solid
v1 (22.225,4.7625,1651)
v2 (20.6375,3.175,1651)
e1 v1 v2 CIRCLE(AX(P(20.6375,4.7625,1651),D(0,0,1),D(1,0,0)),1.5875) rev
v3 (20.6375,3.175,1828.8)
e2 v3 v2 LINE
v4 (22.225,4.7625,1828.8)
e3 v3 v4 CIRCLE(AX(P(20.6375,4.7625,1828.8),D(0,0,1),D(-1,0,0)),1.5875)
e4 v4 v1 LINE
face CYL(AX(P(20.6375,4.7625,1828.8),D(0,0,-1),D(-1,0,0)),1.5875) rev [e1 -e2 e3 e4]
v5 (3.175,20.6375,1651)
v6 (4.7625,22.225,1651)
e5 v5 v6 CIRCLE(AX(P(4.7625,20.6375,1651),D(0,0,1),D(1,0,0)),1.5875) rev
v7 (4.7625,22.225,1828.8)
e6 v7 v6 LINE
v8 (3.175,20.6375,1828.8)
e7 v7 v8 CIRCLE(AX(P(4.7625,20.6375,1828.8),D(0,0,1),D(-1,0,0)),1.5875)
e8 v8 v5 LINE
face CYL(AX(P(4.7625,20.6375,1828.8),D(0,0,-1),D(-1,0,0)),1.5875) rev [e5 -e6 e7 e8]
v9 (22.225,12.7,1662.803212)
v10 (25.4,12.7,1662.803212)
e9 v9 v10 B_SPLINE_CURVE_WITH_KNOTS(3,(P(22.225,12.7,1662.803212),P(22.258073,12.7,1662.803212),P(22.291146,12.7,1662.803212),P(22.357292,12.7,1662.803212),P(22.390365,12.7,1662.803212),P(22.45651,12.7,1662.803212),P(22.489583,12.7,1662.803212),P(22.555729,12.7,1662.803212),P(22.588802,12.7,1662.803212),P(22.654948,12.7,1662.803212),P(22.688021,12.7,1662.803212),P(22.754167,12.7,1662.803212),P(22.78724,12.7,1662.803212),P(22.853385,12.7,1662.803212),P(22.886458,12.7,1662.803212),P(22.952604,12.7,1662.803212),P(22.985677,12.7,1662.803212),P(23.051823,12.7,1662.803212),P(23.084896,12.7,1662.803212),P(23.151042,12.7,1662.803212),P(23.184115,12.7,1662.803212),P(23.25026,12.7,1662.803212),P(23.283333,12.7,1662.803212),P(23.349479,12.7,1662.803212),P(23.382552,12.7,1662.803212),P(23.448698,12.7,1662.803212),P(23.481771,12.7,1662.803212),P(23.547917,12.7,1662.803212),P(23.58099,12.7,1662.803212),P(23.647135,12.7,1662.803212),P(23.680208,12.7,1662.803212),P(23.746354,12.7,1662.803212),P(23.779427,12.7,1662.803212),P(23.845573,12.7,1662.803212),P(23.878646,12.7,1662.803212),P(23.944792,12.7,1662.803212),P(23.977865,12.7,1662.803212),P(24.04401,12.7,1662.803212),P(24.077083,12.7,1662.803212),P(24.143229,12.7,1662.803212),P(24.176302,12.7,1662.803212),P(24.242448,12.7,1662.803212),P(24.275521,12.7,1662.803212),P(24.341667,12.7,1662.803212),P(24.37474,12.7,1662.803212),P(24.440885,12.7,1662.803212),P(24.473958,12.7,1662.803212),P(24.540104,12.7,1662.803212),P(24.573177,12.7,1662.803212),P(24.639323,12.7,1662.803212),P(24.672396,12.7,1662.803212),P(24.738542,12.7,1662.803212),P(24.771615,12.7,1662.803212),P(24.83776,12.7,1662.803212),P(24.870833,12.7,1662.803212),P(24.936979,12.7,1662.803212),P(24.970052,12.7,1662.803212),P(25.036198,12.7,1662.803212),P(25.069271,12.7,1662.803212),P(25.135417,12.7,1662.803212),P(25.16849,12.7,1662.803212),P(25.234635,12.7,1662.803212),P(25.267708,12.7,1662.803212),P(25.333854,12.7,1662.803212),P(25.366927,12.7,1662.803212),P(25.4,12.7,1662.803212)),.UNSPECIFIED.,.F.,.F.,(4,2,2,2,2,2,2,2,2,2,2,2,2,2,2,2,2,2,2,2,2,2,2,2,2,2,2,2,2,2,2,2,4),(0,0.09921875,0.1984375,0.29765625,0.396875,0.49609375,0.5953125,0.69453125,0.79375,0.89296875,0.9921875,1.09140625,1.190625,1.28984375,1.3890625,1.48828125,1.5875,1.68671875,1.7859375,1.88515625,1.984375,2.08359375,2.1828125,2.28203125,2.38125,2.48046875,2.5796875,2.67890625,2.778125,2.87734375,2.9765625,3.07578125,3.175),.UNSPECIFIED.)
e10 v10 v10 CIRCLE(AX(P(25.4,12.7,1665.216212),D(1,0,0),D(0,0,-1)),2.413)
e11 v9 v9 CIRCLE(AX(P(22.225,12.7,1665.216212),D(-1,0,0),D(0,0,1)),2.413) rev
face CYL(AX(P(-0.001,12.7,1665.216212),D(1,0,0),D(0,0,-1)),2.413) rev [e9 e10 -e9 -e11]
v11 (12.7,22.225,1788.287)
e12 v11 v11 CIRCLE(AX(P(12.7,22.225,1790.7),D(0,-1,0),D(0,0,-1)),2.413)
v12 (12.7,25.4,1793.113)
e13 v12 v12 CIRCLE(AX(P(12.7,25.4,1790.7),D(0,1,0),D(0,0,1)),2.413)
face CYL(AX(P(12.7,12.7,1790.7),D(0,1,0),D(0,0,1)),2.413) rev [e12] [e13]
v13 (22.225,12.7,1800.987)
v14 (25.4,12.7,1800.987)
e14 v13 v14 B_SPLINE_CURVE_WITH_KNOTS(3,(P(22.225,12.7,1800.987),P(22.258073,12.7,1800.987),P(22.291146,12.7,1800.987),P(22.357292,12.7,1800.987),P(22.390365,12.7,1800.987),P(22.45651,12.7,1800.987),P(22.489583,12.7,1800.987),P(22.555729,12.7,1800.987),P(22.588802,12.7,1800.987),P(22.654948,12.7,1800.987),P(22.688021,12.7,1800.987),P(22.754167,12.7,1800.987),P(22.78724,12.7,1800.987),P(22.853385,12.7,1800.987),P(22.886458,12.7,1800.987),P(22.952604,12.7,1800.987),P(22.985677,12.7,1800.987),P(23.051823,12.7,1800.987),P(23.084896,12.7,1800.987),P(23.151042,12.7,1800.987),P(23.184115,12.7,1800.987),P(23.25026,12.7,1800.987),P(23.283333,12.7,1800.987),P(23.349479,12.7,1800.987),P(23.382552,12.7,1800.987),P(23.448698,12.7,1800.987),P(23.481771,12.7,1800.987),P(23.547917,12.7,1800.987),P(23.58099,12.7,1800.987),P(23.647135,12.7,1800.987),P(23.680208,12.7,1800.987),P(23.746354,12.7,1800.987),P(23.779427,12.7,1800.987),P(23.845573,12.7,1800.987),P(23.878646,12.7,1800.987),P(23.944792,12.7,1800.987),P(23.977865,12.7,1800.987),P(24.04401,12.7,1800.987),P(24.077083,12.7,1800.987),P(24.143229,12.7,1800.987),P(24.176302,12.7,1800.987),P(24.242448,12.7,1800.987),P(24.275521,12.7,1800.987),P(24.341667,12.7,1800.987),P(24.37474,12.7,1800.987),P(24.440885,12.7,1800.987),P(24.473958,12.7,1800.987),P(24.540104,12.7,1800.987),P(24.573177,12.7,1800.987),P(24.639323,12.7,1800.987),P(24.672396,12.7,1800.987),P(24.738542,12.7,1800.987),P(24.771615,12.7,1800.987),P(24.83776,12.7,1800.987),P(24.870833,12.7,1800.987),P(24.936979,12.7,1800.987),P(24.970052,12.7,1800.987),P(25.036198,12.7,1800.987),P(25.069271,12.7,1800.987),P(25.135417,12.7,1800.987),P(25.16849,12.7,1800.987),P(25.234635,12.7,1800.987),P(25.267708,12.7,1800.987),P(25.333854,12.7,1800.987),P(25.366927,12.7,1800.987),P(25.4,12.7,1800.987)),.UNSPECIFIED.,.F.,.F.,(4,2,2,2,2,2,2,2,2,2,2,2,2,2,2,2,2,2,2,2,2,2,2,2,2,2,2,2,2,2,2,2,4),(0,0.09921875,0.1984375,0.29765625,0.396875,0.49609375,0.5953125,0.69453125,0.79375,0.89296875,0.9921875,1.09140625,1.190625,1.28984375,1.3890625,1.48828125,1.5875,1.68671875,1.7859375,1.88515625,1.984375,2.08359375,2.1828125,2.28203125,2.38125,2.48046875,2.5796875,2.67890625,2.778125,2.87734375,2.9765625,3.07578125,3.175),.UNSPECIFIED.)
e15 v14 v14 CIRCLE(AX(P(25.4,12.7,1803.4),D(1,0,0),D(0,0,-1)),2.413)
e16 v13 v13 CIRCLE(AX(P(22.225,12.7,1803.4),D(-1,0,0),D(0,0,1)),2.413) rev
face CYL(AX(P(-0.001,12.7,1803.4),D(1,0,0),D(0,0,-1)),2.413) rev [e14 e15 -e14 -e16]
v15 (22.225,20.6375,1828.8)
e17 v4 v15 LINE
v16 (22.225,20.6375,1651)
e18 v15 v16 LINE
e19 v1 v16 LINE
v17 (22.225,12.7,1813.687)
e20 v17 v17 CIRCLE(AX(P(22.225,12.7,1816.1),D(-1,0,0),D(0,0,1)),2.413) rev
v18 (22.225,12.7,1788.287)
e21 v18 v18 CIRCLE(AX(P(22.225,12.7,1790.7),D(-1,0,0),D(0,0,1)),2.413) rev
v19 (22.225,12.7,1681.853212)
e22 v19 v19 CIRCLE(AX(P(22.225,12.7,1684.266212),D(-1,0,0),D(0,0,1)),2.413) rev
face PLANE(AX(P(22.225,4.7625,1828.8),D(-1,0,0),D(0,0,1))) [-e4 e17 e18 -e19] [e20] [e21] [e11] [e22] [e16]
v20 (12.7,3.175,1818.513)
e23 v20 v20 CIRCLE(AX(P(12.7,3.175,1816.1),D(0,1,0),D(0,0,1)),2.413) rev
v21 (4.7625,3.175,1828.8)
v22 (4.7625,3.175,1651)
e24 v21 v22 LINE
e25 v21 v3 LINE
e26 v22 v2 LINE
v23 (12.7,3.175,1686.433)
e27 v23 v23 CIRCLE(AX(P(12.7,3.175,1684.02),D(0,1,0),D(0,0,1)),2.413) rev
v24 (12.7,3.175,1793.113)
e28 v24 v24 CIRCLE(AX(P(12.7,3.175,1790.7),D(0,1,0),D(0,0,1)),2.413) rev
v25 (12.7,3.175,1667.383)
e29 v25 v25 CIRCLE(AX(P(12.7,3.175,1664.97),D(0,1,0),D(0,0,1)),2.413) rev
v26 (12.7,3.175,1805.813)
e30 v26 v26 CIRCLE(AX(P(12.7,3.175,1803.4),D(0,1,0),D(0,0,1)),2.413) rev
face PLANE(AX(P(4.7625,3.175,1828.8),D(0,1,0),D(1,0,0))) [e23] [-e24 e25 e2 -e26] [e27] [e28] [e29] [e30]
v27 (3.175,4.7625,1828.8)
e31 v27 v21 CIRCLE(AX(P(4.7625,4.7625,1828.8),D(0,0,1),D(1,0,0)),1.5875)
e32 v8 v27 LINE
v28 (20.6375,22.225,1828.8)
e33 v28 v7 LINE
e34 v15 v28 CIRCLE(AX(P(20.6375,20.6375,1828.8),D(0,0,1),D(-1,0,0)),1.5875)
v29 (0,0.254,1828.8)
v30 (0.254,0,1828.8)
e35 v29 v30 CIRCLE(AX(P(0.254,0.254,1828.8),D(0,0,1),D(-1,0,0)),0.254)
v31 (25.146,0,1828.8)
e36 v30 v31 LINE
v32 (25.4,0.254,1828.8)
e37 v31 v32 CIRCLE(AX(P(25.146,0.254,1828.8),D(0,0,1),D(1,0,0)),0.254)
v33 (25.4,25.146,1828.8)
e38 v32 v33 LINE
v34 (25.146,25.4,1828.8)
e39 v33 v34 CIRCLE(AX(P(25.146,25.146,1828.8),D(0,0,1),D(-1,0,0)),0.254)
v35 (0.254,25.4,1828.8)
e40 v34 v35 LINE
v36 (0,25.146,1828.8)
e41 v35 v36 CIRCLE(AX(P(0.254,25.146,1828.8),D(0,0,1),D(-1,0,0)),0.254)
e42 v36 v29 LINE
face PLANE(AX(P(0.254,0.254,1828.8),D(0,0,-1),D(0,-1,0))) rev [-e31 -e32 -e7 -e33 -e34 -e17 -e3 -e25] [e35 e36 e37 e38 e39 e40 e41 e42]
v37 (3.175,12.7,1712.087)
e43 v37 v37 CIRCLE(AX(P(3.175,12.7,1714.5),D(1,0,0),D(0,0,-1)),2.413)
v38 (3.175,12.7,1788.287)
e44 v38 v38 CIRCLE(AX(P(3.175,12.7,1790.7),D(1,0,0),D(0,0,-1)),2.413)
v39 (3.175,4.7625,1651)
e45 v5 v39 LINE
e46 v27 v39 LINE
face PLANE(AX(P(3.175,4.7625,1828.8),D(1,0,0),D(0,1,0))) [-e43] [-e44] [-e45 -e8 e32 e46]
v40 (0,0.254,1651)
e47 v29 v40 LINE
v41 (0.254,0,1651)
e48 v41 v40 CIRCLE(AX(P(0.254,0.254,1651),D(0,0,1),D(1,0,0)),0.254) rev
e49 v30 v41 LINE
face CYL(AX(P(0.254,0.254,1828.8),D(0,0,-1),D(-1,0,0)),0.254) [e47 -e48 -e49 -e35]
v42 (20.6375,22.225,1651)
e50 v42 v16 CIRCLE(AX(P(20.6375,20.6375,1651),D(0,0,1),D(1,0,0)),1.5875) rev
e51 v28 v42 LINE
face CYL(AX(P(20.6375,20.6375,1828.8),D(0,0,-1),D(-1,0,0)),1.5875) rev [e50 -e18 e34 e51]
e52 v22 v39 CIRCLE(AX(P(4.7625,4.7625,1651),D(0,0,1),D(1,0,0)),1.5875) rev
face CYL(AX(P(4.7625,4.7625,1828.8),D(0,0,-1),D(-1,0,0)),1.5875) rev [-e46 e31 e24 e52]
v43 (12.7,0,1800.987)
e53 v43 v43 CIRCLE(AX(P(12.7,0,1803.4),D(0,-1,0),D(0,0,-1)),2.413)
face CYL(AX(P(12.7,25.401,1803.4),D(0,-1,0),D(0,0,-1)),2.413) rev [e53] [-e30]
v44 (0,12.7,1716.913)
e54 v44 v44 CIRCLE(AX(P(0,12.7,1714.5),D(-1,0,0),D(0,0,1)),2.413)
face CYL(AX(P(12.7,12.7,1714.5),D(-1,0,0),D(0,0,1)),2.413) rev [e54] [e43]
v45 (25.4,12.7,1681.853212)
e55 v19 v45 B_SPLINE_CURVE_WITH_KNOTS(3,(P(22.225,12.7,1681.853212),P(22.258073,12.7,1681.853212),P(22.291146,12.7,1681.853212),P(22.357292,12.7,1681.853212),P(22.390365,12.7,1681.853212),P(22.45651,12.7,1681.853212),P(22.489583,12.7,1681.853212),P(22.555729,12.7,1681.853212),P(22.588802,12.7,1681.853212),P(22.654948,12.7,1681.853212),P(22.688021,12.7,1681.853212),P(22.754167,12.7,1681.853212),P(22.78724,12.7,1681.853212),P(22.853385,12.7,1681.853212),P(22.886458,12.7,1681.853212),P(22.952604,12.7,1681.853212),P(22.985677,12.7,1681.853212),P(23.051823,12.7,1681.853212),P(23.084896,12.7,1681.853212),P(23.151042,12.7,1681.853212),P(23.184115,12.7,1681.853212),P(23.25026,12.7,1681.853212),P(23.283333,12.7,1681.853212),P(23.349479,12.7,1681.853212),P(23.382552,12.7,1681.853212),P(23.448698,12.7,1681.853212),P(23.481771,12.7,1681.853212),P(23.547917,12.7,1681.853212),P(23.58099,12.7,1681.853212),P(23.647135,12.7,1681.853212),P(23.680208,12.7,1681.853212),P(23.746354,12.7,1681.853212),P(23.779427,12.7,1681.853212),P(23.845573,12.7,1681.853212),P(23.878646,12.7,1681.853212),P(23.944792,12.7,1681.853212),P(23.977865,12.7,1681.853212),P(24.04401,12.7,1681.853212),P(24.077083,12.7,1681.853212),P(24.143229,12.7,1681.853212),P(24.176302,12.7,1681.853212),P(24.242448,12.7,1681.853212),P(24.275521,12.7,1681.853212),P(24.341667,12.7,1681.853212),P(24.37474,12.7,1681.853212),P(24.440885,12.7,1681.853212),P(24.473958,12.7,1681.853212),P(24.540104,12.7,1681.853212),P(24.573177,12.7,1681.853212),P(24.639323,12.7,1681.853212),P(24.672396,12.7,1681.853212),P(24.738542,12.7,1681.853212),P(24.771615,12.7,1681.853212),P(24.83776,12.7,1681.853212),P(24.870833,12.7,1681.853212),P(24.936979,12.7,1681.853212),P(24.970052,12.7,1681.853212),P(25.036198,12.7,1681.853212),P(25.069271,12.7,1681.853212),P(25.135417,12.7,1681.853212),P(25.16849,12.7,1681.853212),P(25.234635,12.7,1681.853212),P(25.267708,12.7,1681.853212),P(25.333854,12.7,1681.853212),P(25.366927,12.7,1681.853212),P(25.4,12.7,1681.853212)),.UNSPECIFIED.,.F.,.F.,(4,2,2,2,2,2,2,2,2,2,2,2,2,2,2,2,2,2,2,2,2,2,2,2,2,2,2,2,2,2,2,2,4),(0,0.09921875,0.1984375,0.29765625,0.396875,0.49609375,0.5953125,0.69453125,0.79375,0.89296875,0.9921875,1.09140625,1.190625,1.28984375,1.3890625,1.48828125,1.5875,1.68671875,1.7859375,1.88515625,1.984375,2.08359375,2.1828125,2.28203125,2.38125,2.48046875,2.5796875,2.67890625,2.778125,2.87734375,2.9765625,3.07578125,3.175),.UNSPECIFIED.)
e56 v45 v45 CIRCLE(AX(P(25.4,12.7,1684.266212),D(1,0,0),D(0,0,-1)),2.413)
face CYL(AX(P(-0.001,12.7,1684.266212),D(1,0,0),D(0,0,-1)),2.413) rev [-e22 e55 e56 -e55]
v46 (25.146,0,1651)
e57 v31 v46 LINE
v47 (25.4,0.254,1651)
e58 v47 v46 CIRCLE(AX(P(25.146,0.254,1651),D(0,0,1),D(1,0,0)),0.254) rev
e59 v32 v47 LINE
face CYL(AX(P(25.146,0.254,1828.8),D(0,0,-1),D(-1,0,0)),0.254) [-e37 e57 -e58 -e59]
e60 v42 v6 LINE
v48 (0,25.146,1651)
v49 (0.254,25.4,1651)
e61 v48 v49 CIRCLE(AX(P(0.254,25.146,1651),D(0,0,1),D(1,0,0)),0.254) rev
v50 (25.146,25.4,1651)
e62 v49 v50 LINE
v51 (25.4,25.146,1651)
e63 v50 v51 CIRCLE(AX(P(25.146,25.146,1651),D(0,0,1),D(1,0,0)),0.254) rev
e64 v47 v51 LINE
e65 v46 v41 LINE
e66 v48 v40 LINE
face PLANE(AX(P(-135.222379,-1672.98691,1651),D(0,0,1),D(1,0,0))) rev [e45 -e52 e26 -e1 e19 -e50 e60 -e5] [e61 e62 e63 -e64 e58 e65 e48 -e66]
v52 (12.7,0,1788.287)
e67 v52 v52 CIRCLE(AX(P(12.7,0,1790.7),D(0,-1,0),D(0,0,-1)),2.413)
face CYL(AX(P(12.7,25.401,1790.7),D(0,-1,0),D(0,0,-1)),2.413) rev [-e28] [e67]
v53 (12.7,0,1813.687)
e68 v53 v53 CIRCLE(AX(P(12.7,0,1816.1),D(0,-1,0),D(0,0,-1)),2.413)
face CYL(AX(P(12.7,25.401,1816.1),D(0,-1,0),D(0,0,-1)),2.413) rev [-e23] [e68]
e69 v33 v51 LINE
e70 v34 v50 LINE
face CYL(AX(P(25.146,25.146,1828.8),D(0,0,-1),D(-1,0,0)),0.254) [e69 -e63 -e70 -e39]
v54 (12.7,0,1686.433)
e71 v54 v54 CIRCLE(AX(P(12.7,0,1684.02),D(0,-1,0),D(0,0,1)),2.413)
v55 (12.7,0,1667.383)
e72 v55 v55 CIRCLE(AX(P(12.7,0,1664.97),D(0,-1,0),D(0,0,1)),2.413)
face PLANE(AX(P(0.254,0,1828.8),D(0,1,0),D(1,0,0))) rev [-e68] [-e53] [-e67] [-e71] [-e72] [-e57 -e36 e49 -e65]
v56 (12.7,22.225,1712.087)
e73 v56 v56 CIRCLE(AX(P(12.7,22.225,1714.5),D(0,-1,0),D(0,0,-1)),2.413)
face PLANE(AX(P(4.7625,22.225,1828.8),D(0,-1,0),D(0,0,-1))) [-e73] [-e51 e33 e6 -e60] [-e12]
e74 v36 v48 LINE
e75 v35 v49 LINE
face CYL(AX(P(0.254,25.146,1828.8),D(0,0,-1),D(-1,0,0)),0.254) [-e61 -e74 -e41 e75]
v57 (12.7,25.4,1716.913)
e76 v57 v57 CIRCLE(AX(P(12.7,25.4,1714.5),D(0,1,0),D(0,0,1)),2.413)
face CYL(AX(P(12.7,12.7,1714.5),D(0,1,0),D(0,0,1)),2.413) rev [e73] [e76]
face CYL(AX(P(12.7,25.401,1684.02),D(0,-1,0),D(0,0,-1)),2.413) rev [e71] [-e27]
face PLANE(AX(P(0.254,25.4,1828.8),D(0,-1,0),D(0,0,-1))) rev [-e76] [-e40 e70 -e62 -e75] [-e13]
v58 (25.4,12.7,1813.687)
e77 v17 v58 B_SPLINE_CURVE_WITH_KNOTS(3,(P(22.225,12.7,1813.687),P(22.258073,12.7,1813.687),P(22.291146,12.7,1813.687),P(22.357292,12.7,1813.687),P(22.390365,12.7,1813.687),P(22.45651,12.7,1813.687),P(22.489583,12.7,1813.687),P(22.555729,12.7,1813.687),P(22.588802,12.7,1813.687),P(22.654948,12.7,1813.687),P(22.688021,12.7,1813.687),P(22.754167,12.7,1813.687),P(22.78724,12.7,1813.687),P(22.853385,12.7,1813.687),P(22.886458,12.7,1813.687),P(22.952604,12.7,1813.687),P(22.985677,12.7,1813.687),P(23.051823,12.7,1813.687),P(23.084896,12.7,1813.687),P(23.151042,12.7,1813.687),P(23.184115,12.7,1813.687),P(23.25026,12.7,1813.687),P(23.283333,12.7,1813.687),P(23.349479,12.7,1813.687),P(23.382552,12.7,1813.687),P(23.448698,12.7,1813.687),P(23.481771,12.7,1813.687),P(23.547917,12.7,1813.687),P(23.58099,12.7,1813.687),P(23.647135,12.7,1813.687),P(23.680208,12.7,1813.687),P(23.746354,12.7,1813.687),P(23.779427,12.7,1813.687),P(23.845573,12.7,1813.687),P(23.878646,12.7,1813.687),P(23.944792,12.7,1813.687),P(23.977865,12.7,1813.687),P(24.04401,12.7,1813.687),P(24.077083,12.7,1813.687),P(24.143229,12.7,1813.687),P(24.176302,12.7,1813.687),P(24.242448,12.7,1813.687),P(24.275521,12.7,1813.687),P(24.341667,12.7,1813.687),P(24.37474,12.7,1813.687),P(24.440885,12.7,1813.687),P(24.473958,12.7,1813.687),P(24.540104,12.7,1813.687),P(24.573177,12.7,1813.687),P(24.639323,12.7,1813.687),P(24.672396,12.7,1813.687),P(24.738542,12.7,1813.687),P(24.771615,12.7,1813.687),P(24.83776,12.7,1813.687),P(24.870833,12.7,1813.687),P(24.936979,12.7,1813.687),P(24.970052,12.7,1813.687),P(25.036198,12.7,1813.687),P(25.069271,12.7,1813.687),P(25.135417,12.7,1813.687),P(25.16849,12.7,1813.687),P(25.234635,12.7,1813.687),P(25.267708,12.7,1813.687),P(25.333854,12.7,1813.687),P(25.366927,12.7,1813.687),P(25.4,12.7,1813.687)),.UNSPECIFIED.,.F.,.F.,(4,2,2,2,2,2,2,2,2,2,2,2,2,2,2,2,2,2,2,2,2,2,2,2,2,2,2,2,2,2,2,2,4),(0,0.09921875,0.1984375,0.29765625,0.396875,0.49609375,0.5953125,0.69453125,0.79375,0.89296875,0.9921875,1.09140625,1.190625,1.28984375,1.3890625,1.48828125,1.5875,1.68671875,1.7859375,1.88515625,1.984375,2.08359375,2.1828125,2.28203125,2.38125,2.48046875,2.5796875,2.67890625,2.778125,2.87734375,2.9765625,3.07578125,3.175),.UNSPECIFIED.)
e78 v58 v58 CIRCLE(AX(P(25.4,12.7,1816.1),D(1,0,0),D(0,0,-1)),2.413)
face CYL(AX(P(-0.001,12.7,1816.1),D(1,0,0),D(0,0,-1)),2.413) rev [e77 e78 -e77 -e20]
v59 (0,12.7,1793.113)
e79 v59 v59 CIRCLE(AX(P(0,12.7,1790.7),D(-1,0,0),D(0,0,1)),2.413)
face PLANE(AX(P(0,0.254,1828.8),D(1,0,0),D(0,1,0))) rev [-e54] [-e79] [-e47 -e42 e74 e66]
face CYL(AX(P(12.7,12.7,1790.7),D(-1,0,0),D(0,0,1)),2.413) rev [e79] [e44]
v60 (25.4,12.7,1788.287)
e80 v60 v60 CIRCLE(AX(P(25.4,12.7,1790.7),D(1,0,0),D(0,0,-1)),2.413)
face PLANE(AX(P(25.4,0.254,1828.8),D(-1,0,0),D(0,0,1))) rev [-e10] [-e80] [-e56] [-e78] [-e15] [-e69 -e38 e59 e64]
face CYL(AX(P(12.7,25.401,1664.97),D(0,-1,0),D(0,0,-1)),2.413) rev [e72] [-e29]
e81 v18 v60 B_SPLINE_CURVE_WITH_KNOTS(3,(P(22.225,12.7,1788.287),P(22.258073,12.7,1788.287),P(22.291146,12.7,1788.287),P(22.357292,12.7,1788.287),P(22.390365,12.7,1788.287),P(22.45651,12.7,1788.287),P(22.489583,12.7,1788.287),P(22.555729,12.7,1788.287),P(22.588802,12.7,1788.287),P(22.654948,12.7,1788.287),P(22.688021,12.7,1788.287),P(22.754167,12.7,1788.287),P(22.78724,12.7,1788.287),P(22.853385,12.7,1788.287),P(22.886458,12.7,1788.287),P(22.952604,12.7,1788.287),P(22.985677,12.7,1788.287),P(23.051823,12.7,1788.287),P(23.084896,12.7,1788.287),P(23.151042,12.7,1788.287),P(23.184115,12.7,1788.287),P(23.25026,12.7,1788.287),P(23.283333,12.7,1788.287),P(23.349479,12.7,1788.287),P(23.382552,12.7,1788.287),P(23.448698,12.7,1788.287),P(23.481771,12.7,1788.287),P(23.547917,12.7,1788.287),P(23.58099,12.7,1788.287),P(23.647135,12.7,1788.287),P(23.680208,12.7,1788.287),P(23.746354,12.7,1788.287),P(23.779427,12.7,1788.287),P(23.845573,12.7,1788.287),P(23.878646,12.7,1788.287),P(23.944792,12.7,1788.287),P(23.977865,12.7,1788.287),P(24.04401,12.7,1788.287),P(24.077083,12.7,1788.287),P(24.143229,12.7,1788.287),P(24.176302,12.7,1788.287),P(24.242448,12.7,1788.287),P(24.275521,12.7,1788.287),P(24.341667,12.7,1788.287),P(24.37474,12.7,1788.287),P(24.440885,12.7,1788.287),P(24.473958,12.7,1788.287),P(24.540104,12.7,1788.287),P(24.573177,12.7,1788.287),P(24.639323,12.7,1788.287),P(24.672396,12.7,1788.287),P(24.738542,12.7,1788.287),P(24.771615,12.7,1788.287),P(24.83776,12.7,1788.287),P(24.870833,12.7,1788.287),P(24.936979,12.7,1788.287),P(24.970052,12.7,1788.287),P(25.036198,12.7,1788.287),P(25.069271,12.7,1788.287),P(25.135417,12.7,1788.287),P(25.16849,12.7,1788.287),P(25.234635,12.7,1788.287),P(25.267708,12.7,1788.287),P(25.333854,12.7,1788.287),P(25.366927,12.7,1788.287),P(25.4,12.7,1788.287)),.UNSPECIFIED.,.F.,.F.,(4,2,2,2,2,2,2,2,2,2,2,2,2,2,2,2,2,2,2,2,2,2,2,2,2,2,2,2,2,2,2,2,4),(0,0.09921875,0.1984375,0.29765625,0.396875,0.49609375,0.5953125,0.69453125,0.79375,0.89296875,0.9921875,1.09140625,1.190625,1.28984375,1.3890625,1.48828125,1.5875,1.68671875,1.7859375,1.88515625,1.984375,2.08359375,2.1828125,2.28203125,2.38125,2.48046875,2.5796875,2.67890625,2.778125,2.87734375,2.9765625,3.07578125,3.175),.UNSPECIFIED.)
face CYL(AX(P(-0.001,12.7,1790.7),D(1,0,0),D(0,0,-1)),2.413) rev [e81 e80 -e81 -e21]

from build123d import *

# Parameters (mm, degrees)
CUT_EXTRUDE1_START = 1651
CUT_EXTRUDE1_DEPTH = 177.8
CUT_EXTRUDE2_REACH = 1831.153
SKETCH2_R          = 2.413
CUT_EXTRUDE3_REACH = 1831.153
SKETCH5_R          = 2.413
SKETCH6_R          = 2.413
CUT_EXTRUDE6_DEPTH = 12.7
SKETCH7_R          = 2.413
CUT_EXTRUDE7_DEPTH = 12.7
CUT_EXTRUDE8_REACH = 1831.153
SKETCH8_R          = 2.413
CUT_EXTRUDE9_REACH = 1831.153
SKETCH9_R          = 2.413


with BuildPart() as part:
    # Cut-Extrude1: read off the stored shape, not the designer's step
    # Cut-Extrude1 outline → Cut-Extrude1 (new body)
    with BuildSketch(Plane.XY.offset(CUT_EXTRUDE1_START)):
        with BuildLine():
            Line((0, 25.146), (0, 0.254))
            ThreePointArc((0, 0.254), (0.074394878, 0.074394878), (0.254, 0))
            Line((0.254, 0), (25.146, 0))
            ThreePointArc((25.146, 0), (25.325605122, 0.074394878), (25.4, 0.254))
            Line((25.4, 0.254), (25.4, 25.146))
            ThreePointArc((25.4, 25.146), (25.325605122, 25.325605122), (25.146, 25.4))
            Line((25.146, 25.4), (0.254, 25.4))
            ThreePointArc((0.254, 25.4), (0.074394878, 25.325605122), (0, 25.146))
        make_face()
        with BuildLine():
            ThreePointArc((4.7625, 3.175), (3.639967985, 3.639967985), (3.175, 4.7625))
            Line((3.175, 4.7625), (3.175, 20.6375))
            ThreePointArc((3.175, 20.6375), (3.639967985, 21.760032015), (4.7625, 22.225))
            Line((4.7625, 22.225), (20.6375, 22.225))
            ThreePointArc((20.6375, 22.225), (21.760032015, 21.760032015), (22.225, 20.6375))
            Line((22.225, 20.6375), (22.225, 4.7625))
            ThreePointArc((22.225, 4.7625), (21.760032015, 3.639967985), (20.6375, 3.175))
            Line((20.6375, 3.175), (4.7625, 3.175))
        make_face(mode=Mode.SUBTRACT)
    extrude(amount=CUT_EXTRUDE1_DEPTH)

    # Sketch2 → Cut-Extrude2 (cut, up to next)
    with BuildSketch(Plane(origin=(25.4, 0, 0), x_dir=(0, 0, -1), z_dir=(1, 0, 0)), mode=Mode.PRIVATE) as cut_extrude2_sk1:
        with Locations((-1665.216211664, 12.7)):
            Circle(SKETCH2_R)
    cut_extrude2_tool1 = extrude(cut_extrude2_sk1.sketch, amount=-CUT_EXTRUDE2_REACH, mode=Mode.PRIVATE) & part.part
    # Sketch2 → Cut-Extrude2 (cut, up to next)
    with BuildSketch(Plane(origin=(25.4, 0, 0), x_dir=(0, 0, -1), z_dir=(1, 0, 0)), mode=Mode.PRIVATE) as cut_extrude2_sk2:
        with Locations((-1684.266211664, 12.7)):
            Circle(SKETCH2_R)
    cut_extrude2_tool2 = extrude(cut_extrude2_sk2.sketch, amount=-CUT_EXTRUDE2_REACH, mode=Mode.PRIVATE) & part.part
    add(cut_extrude2_tool1.solids().sort_by_distance((25.4, 12.7, 1665.216212))[0], mode=Mode.SUBTRACT)
    add(cut_extrude2_tool2.solids().sort_by_distance((25.4, 12.7, 1684.266212))[0], mode=Mode.SUBTRACT)

    # Sketch5 → Cut-Extrude3 (cut, up to next)
    with BuildSketch(Plane.XZ, mode=Mode.PRIVATE) as cut_extrude3_sk1:
        with Locations(Location((12.7, 1684.02, 0), (0, 0, 90))):
            Circle(SKETCH5_R)
    cut_extrude3_tool1 = extrude(cut_extrude3_sk1.sketch, amount=-CUT_EXTRUDE3_REACH, mode=Mode.PRIVATE) & part.part
    # Sketch5 → Cut-Extrude3 (cut, up to next)
    with BuildSketch(Plane.XZ, mode=Mode.PRIVATE) as cut_extrude3_sk2:
        with Locations(Location((12.7, 1664.97, 0), (0, 0, 90))):
            Circle(SKETCH5_R)
    cut_extrude3_tool2 = extrude(cut_extrude3_sk2.sketch, amount=-CUT_EXTRUDE3_REACH, mode=Mode.PRIVATE) & part.part
    add(cut_extrude3_tool1.solids().sort_by_distance((12.7, 0, 1684.02))[0], mode=Mode.SUBTRACT)
    add(cut_extrude3_tool2.solids().sort_by_distance((12.7, 0, 1664.97))[0], mode=Mode.SUBTRACT)

    # Sketch6 → Cut-Extrude6 (cut)
    with BuildSketch(Plane(origin=(0, 25.4, 0), x_dir=(1, 0, 0), z_dir=(0, 1, 0))):
        with Locations((12.7, -1638.3)):
            Circle(SKETCH6_R)
        with Locations(Location((12.7, -1714.5, 0), (0, 0, 270))):
            Circle(SKETCH6_R)
        with Locations(Location((12.7, -1790.7, 0), (0, 0, 270))):
            Circle(SKETCH6_R)
    extrude(amount=-CUT_EXTRUDE6_DEPTH, mode=Mode.SUBTRACT)

    # Sketch7 → Cut-Extrude7 (cut)
    with BuildSketch(Plane.ZY):
        with Locations((1638.3, 12.7)):
            Circle(SKETCH7_R)
        with Locations((1714.5, 12.7)):
            Circle(SKETCH7_R)
        with Locations((1790.7, 12.7)):
            Circle(SKETCH7_R)
    extrude(amount=-CUT_EXTRUDE7_DEPTH, mode=Mode.SUBTRACT)

    # Sketch8 → Cut-Extrude8 (cut, up to next)
    with BuildSketch(Plane(origin=(25.4, 0, 0), x_dir=(0, 0, -1), z_dir=(1, 0, 0)), mode=Mode.PRIVATE) as cut_extrude8_sk1:
        with Locations(Location((-1790.7, 12.7, 0), (0, 0, 180))):
            Circle(SKETCH8_R)
    cut_extrude8_tool1 = extrude(cut_extrude8_sk1.sketch, amount=-CUT_EXTRUDE8_REACH, mode=Mode.PRIVATE) & part.part
    # Sketch8 → Cut-Extrude8 (cut, up to next)
    with BuildSketch(Plane(origin=(25.4, 0, 0), x_dir=(0, 0, -1), z_dir=(1, 0, 0)), mode=Mode.PRIVATE) as cut_extrude8_sk2:
        with Locations((-1803.4, 12.7)):
            Circle(SKETCH8_R)
    cut_extrude8_tool2 = extrude(cut_extrude8_sk2.sketch, amount=-CUT_EXTRUDE8_REACH, mode=Mode.PRIVATE) & part.part
    # Sketch8 → Cut-Extrude8 (cut, up to next)
    with BuildSketch(Plane(origin=(25.4, 0, 0), x_dir=(0, 0, -1), z_dir=(1, 0, 0)), mode=Mode.PRIVATE) as cut_extrude8_sk3:
        with Locations((-1816.1, 12.7)):
            Circle(SKETCH8_R)
    cut_extrude8_tool3 = extrude(cut_extrude8_sk3.sketch, amount=-CUT_EXTRUDE8_REACH, mode=Mode.PRIVATE) & part.part
    add(cut_extrude8_tool1.solids().sort_by_distance((25.4, 12.7, 1790.7))[0], mode=Mode.SUBTRACT)
    add(cut_extrude8_tool2.solids().sort_by_distance((25.4, 12.7, 1803.4))[0], mode=Mode.SUBTRACT)
    add(cut_extrude8_tool3.solids().sort_by_distance((25.4, 12.7, 1816.1))[0], mode=Mode.SUBTRACT)

    # Sketch9 → Cut-Extrude9 (cut, up to next)
    with BuildSketch(Plane.XZ, mode=Mode.PRIVATE) as cut_extrude9_sk1:
        with Locations(Location((12.7, 1816.1, 0), (0, 0, 270))):
            Circle(SKETCH9_R)
    cut_extrude9_tool1 = extrude(cut_extrude9_sk1.sketch, amount=-CUT_EXTRUDE9_REACH, mode=Mode.PRIVATE) & part.part
    # Sketch9 → Cut-Extrude9 (cut, up to next)
    with BuildSketch(Plane.XZ, mode=Mode.PRIVATE) as cut_extrude9_sk2:
        with Locations(Location((12.7, 1803.4, 0), (0, 0, 270))):
            Circle(SKETCH9_R)
    cut_extrude9_tool2 = extrude(cut_extrude9_sk2.sketch, amount=-CUT_EXTRUDE9_REACH, mode=Mode.PRIVATE) & part.part
    # Sketch9 → Cut-Extrude9 (cut, up to next)
    with BuildSketch(Plane.XZ, mode=Mode.PRIVATE) as cut_extrude9_sk3:
        with Locations(Location((12.7, 1790.7, 0), (0, 0, 90))):
            Circle(SKETCH9_R)
    cut_extrude9_tool3 = extrude(cut_extrude9_sk3.sketch, amount=-CUT_EXTRUDE9_REACH, mode=Mode.PRIVATE) & part.part
    add(cut_extrude9_tool1.solids().sort_by_distance((12.7, 0, 1816.1))[0], mode=Mode.SUBTRACT)
    add(cut_extrude9_tool2.solids().sort_by_distance((12.7, 0, 1803.4))[0], mode=Mode.SUBTRACT)
    add(cut_extrude9_tool3.solids().sort_by_distance((12.7, 0, 1790.7))[0], mode=Mode.SUBTRACT)


solid = part.part
